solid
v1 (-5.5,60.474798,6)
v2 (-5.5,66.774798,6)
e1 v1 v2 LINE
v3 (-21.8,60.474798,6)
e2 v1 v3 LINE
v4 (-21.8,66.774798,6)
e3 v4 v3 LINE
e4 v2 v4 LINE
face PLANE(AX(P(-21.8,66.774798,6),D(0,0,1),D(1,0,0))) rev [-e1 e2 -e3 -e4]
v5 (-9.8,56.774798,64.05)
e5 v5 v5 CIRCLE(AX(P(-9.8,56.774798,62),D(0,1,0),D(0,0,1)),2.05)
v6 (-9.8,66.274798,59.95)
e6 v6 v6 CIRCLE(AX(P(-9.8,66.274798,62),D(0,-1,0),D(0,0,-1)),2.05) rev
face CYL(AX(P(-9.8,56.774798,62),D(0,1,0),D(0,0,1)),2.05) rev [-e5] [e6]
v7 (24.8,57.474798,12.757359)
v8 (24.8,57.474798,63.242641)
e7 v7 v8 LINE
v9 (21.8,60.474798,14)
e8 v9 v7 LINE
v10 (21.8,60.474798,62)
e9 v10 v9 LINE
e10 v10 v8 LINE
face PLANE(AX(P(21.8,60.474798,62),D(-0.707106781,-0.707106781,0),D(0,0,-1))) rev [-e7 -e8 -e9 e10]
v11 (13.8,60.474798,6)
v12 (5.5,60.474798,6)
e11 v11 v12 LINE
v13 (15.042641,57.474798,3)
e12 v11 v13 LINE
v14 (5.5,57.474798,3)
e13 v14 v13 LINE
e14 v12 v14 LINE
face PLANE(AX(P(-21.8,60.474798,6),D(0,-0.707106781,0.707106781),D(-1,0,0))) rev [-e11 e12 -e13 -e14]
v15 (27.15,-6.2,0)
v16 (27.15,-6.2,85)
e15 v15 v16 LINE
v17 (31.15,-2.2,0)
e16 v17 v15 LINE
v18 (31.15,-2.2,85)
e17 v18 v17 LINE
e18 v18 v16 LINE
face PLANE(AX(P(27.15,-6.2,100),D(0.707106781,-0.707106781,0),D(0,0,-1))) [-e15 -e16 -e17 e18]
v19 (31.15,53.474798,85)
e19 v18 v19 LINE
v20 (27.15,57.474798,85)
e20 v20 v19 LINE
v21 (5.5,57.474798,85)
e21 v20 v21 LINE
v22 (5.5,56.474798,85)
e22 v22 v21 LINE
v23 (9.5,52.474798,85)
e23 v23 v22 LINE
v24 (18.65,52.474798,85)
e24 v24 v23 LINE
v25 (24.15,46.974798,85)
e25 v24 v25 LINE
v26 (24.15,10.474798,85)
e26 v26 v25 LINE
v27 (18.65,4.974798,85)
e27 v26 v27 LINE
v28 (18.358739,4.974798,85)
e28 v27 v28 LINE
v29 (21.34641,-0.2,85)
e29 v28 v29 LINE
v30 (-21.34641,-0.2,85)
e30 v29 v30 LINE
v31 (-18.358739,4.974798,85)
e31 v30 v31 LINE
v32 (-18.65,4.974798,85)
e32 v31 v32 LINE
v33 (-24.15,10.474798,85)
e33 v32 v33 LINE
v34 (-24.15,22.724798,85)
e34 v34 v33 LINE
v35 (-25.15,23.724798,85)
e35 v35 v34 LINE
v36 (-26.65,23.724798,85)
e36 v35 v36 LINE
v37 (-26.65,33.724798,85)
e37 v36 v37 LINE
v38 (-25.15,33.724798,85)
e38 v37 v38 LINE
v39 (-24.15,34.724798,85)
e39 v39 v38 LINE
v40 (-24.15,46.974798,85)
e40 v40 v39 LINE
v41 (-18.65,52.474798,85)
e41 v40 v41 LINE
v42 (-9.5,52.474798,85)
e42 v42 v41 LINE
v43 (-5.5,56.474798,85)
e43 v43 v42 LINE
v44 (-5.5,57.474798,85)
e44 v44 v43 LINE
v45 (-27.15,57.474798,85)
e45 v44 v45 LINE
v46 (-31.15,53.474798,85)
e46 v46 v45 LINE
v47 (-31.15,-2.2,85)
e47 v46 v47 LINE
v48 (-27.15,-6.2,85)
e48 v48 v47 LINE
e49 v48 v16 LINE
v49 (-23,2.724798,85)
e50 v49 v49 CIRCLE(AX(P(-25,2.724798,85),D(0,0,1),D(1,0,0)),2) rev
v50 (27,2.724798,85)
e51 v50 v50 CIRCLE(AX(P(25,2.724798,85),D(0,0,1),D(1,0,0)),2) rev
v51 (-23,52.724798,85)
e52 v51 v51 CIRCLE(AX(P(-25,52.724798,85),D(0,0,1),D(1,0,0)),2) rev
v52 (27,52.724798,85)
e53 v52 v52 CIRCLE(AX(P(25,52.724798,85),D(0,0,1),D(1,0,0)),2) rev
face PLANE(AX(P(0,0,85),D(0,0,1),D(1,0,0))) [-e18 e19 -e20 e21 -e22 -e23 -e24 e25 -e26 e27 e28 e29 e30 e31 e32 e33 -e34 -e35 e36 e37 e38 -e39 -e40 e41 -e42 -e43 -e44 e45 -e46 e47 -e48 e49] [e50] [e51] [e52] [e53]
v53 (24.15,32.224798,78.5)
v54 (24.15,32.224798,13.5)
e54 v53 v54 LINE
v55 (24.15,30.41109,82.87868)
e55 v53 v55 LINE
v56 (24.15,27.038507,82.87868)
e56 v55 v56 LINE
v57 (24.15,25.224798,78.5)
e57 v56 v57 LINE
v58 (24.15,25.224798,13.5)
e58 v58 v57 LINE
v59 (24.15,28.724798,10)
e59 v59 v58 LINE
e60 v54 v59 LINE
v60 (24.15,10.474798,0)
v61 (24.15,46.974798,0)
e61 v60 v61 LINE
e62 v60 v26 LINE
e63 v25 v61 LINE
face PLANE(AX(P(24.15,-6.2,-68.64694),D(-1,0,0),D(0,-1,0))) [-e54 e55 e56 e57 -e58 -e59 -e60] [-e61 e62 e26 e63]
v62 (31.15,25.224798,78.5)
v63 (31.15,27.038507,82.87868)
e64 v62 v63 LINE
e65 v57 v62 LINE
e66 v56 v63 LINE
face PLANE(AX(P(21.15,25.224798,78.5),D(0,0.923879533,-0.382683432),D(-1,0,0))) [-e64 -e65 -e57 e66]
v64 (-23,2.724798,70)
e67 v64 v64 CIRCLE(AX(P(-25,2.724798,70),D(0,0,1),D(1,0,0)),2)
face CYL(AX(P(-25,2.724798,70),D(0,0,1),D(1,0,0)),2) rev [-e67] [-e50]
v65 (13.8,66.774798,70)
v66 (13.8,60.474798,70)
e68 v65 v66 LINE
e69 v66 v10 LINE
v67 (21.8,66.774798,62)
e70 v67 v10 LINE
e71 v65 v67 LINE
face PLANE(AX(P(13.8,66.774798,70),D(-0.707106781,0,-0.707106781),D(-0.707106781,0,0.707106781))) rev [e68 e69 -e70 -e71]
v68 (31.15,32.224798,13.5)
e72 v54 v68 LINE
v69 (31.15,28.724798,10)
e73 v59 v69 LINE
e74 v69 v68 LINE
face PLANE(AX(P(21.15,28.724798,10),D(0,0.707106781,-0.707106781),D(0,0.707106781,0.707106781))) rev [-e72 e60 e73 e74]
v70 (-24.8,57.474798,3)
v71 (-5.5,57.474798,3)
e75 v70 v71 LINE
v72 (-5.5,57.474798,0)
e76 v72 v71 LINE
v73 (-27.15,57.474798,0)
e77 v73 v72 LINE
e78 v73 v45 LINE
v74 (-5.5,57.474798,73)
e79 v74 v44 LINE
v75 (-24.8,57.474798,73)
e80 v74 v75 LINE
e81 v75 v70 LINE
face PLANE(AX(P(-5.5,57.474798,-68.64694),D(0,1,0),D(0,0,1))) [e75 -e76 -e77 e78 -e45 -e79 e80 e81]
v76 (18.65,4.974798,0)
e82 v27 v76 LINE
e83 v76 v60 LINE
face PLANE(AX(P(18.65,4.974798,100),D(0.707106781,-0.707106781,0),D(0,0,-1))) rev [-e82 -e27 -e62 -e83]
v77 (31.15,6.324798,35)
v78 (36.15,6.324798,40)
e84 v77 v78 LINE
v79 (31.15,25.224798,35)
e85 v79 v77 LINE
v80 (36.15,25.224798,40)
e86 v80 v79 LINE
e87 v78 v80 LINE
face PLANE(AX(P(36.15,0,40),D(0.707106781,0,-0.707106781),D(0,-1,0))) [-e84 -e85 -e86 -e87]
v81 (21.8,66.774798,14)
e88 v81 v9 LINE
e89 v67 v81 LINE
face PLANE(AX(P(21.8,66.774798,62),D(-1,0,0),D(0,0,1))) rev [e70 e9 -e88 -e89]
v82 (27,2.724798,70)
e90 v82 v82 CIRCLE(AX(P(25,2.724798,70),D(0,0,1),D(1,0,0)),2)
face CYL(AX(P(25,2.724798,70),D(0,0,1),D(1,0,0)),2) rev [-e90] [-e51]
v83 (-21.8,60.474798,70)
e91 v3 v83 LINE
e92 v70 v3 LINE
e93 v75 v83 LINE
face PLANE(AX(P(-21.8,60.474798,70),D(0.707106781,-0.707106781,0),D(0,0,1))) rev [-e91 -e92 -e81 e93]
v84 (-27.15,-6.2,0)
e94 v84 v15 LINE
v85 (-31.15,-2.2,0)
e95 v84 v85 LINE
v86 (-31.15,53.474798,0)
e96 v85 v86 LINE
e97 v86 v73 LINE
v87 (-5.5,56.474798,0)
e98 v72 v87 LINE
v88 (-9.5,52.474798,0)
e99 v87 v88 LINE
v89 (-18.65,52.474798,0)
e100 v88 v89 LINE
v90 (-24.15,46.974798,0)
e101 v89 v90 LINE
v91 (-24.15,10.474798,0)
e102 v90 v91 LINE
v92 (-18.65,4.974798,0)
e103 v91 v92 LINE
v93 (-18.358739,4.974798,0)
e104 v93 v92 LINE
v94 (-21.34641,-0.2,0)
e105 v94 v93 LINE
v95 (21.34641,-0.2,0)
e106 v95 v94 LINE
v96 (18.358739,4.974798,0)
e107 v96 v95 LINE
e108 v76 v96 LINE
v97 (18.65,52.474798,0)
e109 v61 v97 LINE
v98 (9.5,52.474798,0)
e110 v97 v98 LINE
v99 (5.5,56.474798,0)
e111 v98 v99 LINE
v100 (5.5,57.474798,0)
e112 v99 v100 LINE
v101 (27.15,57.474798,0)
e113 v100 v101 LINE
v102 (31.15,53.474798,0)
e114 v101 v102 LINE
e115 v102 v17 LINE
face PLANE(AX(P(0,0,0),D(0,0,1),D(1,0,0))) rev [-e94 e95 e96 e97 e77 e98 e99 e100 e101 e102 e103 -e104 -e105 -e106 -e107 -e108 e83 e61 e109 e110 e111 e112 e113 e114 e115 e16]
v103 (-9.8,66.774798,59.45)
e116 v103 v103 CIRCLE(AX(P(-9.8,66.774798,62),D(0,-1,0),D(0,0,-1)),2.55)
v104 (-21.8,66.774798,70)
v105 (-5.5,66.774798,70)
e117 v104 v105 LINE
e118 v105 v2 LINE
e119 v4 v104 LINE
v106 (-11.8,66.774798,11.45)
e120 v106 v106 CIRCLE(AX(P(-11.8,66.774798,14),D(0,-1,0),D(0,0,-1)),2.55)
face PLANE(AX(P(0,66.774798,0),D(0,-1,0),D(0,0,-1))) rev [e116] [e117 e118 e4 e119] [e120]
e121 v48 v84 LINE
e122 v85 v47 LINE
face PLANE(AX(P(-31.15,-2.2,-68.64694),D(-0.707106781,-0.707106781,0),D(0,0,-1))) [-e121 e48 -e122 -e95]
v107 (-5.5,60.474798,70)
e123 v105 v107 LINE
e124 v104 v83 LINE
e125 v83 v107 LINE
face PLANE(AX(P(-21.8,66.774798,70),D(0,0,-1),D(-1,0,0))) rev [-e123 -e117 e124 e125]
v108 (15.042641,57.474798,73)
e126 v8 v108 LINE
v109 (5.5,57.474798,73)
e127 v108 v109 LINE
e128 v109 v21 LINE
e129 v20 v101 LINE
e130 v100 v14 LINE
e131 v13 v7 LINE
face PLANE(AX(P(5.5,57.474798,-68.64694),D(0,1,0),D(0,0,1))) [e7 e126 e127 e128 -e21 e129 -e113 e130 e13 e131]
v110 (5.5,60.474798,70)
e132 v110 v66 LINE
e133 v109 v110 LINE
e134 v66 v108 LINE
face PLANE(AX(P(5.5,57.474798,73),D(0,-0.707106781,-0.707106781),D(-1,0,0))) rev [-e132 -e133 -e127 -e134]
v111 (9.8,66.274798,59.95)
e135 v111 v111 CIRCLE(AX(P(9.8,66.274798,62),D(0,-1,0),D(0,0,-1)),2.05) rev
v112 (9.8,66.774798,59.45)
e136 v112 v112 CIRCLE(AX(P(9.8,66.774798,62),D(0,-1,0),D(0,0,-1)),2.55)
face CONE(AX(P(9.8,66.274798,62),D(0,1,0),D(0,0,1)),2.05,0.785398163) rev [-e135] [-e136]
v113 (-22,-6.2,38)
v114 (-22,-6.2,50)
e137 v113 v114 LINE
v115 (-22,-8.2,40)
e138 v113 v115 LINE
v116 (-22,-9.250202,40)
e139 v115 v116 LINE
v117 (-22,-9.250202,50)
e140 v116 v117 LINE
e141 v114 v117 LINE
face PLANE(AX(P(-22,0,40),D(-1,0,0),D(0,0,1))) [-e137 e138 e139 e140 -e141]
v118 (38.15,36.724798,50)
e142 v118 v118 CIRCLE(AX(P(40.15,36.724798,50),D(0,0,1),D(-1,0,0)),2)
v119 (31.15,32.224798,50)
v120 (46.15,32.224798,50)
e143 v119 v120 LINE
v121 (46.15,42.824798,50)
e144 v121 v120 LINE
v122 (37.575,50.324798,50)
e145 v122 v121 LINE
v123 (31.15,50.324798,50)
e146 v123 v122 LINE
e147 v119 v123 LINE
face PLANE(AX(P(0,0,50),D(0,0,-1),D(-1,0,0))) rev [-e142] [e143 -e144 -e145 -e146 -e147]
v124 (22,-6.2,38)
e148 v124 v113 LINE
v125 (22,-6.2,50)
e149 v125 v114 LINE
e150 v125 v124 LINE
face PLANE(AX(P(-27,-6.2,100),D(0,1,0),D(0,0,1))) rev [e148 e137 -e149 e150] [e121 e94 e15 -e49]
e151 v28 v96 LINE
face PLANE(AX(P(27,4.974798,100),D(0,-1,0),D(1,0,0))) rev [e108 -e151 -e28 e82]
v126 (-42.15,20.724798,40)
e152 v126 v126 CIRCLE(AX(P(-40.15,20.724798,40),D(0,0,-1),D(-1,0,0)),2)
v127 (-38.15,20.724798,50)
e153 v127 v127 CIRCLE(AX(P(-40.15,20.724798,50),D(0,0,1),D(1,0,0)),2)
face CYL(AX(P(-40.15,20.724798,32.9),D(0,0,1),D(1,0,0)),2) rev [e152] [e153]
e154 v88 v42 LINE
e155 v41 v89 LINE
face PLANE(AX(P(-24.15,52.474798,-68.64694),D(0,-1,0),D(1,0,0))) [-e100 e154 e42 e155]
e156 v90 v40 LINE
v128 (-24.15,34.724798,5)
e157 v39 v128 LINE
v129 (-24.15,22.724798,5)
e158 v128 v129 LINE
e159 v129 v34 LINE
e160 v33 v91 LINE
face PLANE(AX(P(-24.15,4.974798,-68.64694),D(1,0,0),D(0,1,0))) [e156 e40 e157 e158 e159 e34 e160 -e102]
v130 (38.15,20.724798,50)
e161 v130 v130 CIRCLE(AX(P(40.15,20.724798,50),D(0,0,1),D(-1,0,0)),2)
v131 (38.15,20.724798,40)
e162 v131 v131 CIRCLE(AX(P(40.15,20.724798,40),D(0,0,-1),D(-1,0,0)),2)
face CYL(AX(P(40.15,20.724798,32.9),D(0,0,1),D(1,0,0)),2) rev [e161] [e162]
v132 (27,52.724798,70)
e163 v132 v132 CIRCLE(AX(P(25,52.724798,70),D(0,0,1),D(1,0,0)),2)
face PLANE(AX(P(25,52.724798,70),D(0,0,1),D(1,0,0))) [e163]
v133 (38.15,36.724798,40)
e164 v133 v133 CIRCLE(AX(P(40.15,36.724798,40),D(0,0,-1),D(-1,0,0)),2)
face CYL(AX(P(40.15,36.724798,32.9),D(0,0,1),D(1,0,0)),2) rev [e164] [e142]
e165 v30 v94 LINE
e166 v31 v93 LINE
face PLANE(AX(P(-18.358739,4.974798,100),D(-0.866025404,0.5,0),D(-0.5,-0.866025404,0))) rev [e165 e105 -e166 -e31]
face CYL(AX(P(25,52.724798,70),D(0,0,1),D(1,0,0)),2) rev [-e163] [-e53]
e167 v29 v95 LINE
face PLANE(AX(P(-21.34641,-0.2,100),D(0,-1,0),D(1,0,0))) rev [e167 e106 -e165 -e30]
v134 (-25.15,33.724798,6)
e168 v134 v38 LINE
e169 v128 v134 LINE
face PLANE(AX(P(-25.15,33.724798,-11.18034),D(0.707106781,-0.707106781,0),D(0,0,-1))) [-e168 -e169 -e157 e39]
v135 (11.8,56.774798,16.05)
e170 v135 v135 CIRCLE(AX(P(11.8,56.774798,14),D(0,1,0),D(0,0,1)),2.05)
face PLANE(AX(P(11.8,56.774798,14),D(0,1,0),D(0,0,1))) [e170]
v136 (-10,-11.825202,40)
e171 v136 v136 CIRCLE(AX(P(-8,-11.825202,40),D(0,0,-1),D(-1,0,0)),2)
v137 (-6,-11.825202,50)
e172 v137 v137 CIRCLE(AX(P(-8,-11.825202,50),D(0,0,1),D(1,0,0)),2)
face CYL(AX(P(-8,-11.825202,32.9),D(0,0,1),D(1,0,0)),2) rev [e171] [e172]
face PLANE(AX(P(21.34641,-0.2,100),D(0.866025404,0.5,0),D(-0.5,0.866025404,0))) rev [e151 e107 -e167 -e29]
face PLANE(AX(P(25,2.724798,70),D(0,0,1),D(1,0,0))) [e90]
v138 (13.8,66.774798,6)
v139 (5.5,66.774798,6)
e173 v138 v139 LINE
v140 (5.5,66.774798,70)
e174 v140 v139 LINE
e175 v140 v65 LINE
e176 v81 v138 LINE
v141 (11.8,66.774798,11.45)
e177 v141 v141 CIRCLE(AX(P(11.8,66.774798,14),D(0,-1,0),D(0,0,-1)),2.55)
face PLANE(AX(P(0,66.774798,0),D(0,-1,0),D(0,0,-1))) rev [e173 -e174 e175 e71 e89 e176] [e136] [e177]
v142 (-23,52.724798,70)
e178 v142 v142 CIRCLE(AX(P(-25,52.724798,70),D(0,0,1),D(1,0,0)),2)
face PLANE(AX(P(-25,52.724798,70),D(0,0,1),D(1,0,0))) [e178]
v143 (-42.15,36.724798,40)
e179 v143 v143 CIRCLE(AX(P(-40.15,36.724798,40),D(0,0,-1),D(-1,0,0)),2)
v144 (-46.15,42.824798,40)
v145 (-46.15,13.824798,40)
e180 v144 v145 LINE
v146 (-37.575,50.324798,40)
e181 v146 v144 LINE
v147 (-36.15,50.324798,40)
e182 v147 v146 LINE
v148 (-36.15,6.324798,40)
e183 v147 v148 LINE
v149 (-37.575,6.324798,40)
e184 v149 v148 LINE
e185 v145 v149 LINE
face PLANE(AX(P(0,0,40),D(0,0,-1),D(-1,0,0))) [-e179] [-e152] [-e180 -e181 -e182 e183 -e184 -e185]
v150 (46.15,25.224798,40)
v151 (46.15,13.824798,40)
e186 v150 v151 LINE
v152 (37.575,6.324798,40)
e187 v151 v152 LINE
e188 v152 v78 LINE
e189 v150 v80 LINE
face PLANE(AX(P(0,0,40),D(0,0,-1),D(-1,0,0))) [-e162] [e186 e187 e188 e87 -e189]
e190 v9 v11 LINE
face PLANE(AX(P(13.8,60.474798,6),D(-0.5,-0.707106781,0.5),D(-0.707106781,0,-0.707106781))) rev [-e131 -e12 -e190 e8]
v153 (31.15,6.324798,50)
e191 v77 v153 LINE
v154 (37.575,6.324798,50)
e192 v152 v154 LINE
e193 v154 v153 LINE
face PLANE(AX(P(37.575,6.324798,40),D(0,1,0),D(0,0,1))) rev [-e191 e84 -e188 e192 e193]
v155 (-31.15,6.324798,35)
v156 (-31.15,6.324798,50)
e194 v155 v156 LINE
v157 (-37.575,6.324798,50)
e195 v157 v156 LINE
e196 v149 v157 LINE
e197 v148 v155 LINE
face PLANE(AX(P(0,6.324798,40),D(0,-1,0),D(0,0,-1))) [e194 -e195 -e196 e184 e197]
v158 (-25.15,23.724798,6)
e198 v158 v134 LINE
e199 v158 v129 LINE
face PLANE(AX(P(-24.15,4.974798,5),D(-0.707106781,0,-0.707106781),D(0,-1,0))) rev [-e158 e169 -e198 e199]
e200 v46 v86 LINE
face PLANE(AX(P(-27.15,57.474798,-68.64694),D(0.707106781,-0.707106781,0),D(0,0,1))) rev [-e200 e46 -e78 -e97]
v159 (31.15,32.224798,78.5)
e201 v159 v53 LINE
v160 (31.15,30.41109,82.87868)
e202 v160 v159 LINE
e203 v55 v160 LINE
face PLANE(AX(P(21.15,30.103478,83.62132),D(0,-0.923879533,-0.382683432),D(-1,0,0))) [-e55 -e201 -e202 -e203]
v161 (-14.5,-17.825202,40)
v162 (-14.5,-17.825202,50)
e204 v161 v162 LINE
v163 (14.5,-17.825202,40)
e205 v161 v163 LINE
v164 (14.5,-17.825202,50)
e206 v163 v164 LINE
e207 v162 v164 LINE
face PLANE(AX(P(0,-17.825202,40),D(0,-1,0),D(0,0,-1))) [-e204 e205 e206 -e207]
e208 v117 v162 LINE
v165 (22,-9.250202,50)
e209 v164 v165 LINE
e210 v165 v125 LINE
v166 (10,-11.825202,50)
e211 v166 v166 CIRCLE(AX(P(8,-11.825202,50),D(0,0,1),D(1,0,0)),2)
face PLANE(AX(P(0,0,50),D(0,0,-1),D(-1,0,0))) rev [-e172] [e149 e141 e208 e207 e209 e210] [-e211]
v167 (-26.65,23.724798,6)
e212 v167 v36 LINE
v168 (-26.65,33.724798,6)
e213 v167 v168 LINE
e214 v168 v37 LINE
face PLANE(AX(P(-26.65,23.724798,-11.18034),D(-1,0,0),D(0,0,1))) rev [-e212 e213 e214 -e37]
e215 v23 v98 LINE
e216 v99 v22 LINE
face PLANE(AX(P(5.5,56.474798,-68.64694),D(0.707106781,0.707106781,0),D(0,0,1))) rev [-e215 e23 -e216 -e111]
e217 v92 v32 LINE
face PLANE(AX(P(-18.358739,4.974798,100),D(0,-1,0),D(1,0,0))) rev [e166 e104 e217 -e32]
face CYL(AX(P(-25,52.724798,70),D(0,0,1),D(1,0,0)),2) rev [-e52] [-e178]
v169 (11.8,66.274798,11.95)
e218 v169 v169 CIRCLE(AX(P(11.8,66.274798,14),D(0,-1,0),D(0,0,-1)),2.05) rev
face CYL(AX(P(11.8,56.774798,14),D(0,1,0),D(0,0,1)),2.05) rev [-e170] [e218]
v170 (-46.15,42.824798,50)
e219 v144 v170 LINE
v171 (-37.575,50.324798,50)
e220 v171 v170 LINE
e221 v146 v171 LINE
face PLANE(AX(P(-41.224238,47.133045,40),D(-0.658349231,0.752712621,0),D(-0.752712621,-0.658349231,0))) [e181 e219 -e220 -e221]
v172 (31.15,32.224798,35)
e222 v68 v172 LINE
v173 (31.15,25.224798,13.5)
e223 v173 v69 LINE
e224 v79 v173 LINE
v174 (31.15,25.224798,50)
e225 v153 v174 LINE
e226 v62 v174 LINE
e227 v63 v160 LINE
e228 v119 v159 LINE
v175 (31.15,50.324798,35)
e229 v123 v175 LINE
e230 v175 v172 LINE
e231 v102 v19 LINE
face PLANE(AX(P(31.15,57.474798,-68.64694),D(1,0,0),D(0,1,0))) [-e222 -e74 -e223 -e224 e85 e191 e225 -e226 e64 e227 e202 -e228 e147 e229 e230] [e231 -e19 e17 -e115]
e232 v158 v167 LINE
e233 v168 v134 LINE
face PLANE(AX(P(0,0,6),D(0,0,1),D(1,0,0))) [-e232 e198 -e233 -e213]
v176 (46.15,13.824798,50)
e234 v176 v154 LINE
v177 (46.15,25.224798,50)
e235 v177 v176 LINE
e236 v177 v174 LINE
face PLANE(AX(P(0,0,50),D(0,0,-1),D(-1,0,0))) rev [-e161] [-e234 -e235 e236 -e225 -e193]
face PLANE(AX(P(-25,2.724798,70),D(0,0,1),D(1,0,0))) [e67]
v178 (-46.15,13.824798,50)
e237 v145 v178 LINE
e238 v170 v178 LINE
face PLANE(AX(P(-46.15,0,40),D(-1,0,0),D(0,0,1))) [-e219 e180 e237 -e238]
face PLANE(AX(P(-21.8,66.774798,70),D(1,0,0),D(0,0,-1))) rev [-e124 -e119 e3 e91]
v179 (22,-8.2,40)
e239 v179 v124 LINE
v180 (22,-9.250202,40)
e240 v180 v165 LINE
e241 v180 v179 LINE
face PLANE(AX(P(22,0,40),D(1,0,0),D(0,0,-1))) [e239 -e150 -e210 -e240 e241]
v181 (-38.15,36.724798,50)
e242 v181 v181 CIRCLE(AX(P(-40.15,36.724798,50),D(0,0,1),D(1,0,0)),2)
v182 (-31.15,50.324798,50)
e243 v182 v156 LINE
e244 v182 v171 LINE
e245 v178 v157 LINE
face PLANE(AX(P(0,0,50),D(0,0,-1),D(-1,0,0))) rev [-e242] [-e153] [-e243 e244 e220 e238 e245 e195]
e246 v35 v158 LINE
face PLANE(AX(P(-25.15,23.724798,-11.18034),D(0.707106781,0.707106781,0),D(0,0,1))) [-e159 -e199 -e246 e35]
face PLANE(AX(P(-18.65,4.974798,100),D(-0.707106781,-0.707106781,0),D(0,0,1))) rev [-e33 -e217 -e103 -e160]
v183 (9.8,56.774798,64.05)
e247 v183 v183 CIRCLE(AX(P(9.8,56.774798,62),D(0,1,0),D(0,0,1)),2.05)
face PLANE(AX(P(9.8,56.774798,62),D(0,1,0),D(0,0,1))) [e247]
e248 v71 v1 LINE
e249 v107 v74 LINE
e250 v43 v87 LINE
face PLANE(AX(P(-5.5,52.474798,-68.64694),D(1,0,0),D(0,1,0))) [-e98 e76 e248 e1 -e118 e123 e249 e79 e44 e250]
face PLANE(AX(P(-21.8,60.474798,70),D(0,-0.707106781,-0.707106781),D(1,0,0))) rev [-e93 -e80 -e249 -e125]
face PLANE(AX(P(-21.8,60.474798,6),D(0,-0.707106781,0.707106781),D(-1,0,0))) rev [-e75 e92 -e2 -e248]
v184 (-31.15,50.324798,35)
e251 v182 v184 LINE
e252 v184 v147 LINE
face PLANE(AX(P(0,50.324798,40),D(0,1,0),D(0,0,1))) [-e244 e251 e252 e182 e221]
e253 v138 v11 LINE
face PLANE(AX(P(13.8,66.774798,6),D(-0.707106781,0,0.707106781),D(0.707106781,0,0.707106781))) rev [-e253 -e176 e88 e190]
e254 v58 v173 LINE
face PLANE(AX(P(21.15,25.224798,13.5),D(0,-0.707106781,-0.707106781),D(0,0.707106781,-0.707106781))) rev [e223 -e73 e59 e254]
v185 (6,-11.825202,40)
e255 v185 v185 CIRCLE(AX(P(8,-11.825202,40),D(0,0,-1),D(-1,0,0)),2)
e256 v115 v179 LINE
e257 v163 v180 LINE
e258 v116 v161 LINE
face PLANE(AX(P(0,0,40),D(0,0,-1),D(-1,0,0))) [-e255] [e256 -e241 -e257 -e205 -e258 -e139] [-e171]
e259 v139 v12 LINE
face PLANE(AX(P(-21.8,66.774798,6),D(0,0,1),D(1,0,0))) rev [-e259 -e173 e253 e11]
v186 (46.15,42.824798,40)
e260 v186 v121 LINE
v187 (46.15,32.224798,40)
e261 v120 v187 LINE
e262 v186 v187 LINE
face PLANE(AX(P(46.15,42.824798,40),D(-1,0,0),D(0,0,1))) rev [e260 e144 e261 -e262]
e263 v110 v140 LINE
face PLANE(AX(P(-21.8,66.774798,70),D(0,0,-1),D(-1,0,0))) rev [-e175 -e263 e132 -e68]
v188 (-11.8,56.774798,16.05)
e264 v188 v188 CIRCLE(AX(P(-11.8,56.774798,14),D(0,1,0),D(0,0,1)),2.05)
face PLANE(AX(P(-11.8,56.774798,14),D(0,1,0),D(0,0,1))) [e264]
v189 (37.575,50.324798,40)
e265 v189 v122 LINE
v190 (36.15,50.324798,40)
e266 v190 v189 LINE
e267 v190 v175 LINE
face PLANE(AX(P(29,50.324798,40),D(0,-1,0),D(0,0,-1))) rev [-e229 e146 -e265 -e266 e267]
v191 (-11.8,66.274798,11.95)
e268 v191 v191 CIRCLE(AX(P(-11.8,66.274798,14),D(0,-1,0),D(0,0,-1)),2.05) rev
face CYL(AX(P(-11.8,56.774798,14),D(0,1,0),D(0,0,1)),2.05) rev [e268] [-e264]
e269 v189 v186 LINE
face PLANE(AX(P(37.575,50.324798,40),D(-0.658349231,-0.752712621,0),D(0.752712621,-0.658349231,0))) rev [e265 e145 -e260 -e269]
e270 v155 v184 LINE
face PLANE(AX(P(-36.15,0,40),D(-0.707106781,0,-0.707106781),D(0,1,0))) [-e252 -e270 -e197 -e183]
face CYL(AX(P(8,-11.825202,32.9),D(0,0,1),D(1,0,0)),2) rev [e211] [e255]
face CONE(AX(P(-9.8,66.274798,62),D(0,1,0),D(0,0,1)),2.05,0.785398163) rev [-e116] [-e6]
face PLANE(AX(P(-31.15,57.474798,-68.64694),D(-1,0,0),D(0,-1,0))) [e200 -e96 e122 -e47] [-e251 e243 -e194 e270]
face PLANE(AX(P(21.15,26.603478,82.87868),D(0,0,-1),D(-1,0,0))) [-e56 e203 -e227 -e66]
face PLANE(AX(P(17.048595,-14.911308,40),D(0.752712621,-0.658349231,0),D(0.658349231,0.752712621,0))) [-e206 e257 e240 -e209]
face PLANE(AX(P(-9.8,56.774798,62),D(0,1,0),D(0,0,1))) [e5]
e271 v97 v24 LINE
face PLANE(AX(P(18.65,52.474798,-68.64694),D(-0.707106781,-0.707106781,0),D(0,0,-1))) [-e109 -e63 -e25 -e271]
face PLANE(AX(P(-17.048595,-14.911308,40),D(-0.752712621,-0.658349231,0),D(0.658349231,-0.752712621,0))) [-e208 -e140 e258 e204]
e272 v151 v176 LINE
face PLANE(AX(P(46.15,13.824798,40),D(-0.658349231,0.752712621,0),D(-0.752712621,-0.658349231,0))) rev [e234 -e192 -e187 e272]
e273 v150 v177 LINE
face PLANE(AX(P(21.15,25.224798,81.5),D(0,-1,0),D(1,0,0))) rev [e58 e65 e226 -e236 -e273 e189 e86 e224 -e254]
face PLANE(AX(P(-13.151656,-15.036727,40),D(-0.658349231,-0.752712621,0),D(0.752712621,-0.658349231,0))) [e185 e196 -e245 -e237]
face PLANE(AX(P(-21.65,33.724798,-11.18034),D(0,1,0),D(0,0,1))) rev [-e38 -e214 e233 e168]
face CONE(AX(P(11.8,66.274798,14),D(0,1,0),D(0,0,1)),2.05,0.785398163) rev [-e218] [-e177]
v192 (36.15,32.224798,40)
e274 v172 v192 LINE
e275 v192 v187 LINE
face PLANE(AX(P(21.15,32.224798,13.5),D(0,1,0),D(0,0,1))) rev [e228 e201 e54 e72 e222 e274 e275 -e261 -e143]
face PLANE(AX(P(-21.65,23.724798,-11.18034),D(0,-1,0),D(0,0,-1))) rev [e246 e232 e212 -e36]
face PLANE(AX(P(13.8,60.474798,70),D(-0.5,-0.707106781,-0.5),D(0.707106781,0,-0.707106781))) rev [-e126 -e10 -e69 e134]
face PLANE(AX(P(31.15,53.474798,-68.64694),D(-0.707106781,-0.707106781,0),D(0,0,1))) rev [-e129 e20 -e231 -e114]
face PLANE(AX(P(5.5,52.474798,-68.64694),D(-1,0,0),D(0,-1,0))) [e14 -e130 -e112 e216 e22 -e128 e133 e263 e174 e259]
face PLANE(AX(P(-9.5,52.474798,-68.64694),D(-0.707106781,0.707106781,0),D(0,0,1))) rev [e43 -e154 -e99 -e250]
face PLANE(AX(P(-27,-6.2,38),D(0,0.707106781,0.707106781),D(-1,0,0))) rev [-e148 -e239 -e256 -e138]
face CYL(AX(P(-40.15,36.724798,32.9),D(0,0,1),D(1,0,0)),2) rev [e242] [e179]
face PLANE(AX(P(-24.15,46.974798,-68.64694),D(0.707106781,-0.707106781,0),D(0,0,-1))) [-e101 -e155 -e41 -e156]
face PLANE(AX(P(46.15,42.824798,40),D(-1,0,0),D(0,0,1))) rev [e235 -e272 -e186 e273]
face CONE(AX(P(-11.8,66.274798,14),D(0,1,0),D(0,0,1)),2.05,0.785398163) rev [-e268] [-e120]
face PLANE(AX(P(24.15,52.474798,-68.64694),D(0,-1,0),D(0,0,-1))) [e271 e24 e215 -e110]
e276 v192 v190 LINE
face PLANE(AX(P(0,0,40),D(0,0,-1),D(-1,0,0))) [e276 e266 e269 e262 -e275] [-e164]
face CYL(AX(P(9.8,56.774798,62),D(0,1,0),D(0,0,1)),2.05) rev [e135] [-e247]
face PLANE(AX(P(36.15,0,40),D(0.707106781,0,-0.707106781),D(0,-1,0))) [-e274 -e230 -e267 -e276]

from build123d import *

# Parameters (mm, degrees)
BOSS_EXTRUDE1_DEPTH     = 100
BOSS_EXTRUDE2_DEPTH     = 100
CUT_EXTRUDE1_DEPTH      = 10
CHAMFER1_SIZE           = 5.5
CHAMFER2_SIZE           = 4
SKETCH8_R               = 2
BOSS_EXTRUDE3_DEPTH     = 9.3
CUT_EXTRUDE3_DEPTH      = 125.214315536
CUT_EXTRUDE3_DEPTH_BACK = 10
SKETCH9_W               = 11
SKETCH9_H               = 9.3
CHAMFER3_SIZE           = 4
CHAMFER4_SIZE           = 3
CHAMFER5_SIZE           = 3
SKETCH10_W              = 5
SKETCH10_H              = 10
CUT_EXTRUDE4_DEPTH      = 94
CHAMFER7_SIZE           = 1
CHAMFER8_SIZE           = 1
SKETCH11_R              = 2.05
CUT_EXTRUDE5_DEPTH      = 10
CHAMFER9_SIZE           = 0.5
SKETCH12_R              = 2
CUT_EXTRUDE6_DEPTH      = 30
BOSS_EXTRUDE6_START     = -2
BOSS_EXTRUDE6_DEPTH     = 10
SKETCH17_R              = 2
CUT_EXTRUDE7_DEPTH      = 17.1
SKETCH19_W              = 50
SKETCH19_H              = 7
CUT_EXTRUDE13_DEPTH     = 17.1
SKETCH20_W              = 62.3
SKETCH20_H              = 63.674798271
CUT_EXTRUDE14_DEPTH     = 15
CHAMFER10_SIZE          = 5
CHAMFER11_SIZE          = 2


with BuildPart() as part:
    # Sketch4 → Boss-Extrude1 (new body)
    with BuildSketch(Plane.XY):
        Polygon((-18.358738987, 4.974798271), (-27, 4.974798271), (-27, -6.2), (27, -6.2), (27, 4.974798271), (18.358738987, 4.974798271), (21.346410162, -0.2), (-21.346410162, -0.2), align=None)
    extrude(amount=BOSS_EXTRUDE1_DEPTH)

    # Sketch6 → Boss-Extrude2 (add)
    with BuildSketch(Plane.XY.offset(100)):
        Polygon((-24.15, 4.974798271), (-24.15, 52.474798271), (-5.5, 52.474798271), (-5.5, 57.474798271), (-31.15, 57.474798271), (-31.15, -6.2), (-24.15, -6.2), align=None)
        Polygon((24.15, -6.2), (24.15, 52.474798271), (5.5, 52.474798271), (5.5, 57.474798271), (31.15, 57.474798271), (31.15, -6.2), align=None)
    extrude(amount=-BOSS_EXTRUDE2_DEPTH)

    # Sketch7 → Cut-Extrude1 (cut)
    with BuildSketch(Plane(origin=(31.15, 0, 0), x_dir=(0, 0, -1), z_dir=(1, 0, 0))):
        Polygon((-85, 28.724798271), (-81.5, 25.224798271), (-13.5, 25.224798271), (-10, 28.724798271), (-13.5, 32.224798271), (-81.5, 32.224798271), align=None)
    extrude(amount=-CUT_EXTRUDE1_DEPTH, mode=Mode.SUBTRACT)

    # Chamfer1
    chamfer1_edges = [part.edges().sort_by_distance(p)[0] for p in [
        (-24.15, 52.474798271, 50),
        (-24.15, 4.974798271, 50),
        (24.15, 4.974798271, 50),
        (24.15, 52.474798271, 50),
    ]]
    chamfer(chamfer1_edges, length=CHAMFER1_SIZE)

    # Chamfer2
    chamfer2_edges = [part.edges().sort_by_distance(p)[0] for p in [
        (-5.5, 52.474798271, 50),
        (5.5, 52.474798271, 50),
    ]]
    chamfer(chamfer2_edges, length=CHAMFER2_SIZE)

    # Sketch8 → Boss-Extrude3 (add)
    with BuildSketch(Plane(origin=(0, 57.474798271, 0), x_dir=(1, 0, 0), z_dir=(0, 1, 0))):
        Polygon((-21.8, -70), (13.8, -70), (21.8, -62), (21.8, -14), (13.8, -6), (-21.8, -6), align=None)
        with Locations(Location((9.8, -62, 0), (0, 0, 270))):
            Circle(SKETCH8_R, mode=Mode.SUBTRACT)
        with Locations(Location((11.8, -14, 0), (0, 0, 270))):
            Circle(SKETCH8_R, mode=Mode.SUBTRACT)
        with Locations(Location((-11.8, -14, 0), (0, 0, 270))):
            Circle(SKETCH8_R, mode=Mode.SUBTRACT)
        with Locations(Location((-9.8, -62, 0), (0, 0, 270))):
            Circle(SKETCH8_R, mode=Mode.SUBTRACT)
    extrude(amount=BOSS_EXTRUDE3_DEPTH)

    # Sketch9 → Cut-Extrude3 (cut, two sides: drawn at the far end of the back side and taken through both)
    with BuildSketch(Plane.XY.offset(-CUT_EXTRUDE3_DEPTH_BACK)):
        with Locations((0, 62.124798271)):
            Rectangle(SKETCH9_W, SKETCH9_H)
    extrude(amount=CUT_EXTRUDE3_DEPTH + CUT_EXTRUDE3_DEPTH_BACK, mode=Mode.SUBTRACT)

    # Chamfer3
    chamfer3_edges = [part.edges().sort_by_distance(p)[0] for p in [
        (-31.15, -6.2, 50),
        (-31.15, 57.474798271, 50),
        (31.15, -6.2, 50),
        (31.15, 57.474798271, 50),
    ]]
    chamfer(chamfer3_edges, length=CHAMFER3_SIZE)

    # Chamfer4
    chamfer4_edges = [part.edges().sort_by_distance(p)[0] for p in [
        (9.65, 57.474798271, 70),
        (-21.8, 57.474798271, 38),
        (-13.65, 57.474798271, 70),
        (17.8, 57.474798271, 66),
        (21.8, 57.474798271, 38),
        (17.8, 57.474798271, 10),
        (9.65, 57.474798271, 6),
        (-13.65, 57.474798271, 6),
    ]]
    chamfer(chamfer4_edges, length=CHAMFER4_SIZE)

    # Chamfer5
    # the kernel refuses this chamfer: 3 mm, written as the material it adds along each edge
    with BuildSketch(Plane(origin=(31.15, 25.224798271, 81.5), x_dir=(0, -0.014760203742521738, -0.9998910622590239), z_dir=(-1, 0, 0)), Plane(origin=(31.15, 32.224798271, 81.5), x_dir=(0, -0.6965927104131427, 0.7174667907292097), z_dir=(-1, 0, 0))) as chamfer5_piece_1:
        Polygon((CHAMFER5_SIZE * 0.999891062259, -CHAMFER5_SIZE * 0.0147602037425), (-CHAMFER5_SIZE * 0.717466790729, -CHAMFER5_SIZE * 0.696592710413), (0, 0), align=None)
    extrude(amount=7)
    with BuildSketch(Plane(origin=(31.15, 28.724798271, 85), x_dir=(0, 0.7262819568766863, -0.687396915264661), z_dir=(-1, 0, 0))) as chamfer5_piece_2:
        Polygon((CHAMFER5_SIZE * 0.999621916911, CHAMFER5_SIZE * 0.0274958766106), (-CHAMFER5_SIZE * 0.0274958766106, CHAMFER5_SIZE * 0.999621916911), (0, 0), align=None)
    extrude(amount=7)

    # Sketch10 → Cut-Extrude4 (cut)
    with BuildSketch(Plane.XY.offset(100)):
        with Locations((-24.15, 28.724798271)):
            Rectangle(SKETCH10_W, SKETCH10_H)
    extrude(amount=-CUT_EXTRUDE4_DEPTH, mode=Mode.SUBTRACT)

    # Chamfer7
    chamfer7_edges = [part.edges().sort_by_distance(p)[0] for p in [
        (-24.15, 28.724798271, 6),
    ]]
    chamfer(chamfer7_edges, length=CHAMFER7_SIZE)

    # Chamfer8
    chamfer8_edges = [part.edges().sort_by_distance(p)[0] for p in [
        (-24.15, 23.724798271, 52.5),
        (-24.15, 33.724798271, 52.5),
    ]]
    chamfer(chamfer8_edges, length=CHAMFER8_SIZE)

    # Sketch11 → Cut-Extrude5 (cut)
    with BuildSketch(Plane(origin=(0, 66.774798271, 0), x_dir=(1, 0, 0), z_dir=(0, 1, 0))):
        with Locations(Location((-11.8, -14, 0), (0, 0, 270))):
            Circle(SKETCH11_R)
        with Locations(Location((11.8, -14, 0), (0, 0, 270))):
            Circle(SKETCH11_R)
        with Locations(Location((-9.8, -62, 0), (0, 0, 270))):
            Circle(SKETCH11_R)
        with Locations(Location((9.8, -62, 0), (0, 0, 270))):
            Circle(SKETCH11_R)
    extrude(amount=-CUT_EXTRUDE5_DEPTH, mode=Mode.SUBTRACT)

    # Chamfer9
    chamfer9_edges = [part.edges().sort_by_distance(p)[0] for p in [
        (11.8, 66.774798271, 11.95),
        (-9.8, 66.774798271, 59.95),
        (9.8, 66.774798271, 59.95),
        (-11.8, 66.774798271, 11.95),
    ]]
    chamfer(chamfer9_edges, length=CHAMFER9_SIZE)

    # Sketch12 → Cut-Extrude6 (cut)
    with BuildSketch(Plane.XY.offset(100)):
        with Locations((-25, 52.724798271)):
            Circle(SKETCH12_R)
        with Locations((25, 52.724798271)):
            Circle(SKETCH12_R)
        with Locations((-25, 2.724798271)):
            Circle(SKETCH12_R)
        with Locations((25, 2.724798271)):
            Circle(SKETCH12_R)
    extrude(amount=-CUT_EXTRUDE6_DEPTH, mode=Mode.SUBTRACT)

    # Sketch16 → Boss-Extrude6 (add)
    with BuildSketch(Plane(origin=(0, 0, 48), x_dir=(-1, 0, 0), z_dir=(0, 0, -1)).offset(BOSS_EXTRUDE6_START)):
        Polygon((-22, -0.675201729), (22, -0.675201729), (22, -9.250201729), (14.5, -17.825201729), (-14.5, -17.825201729), (-22, -9.250201729), align=None)
        Polygon((-29, 50.324798271), (-37.575, 50.324798271), (-46.15, 42.824798271), (-46.15, 13.824798271), (-37.575, 6.324798271), (-29, 6.324798271), align=None)
        Polygon((37.575, 6.324798271), (29, 6.324798271), (29, 50.324798271), (37.575, 50.324798271), (46.15, 42.824798271), (46.15, 13.824798271), align=None)
    extrude(amount=BOSS_EXTRUDE6_DEPTH)

    # Sketch17 → Cut-Extrude7 (cut)
    with BuildSketch(Plane.XY.offset(50)):
        with Locations((-40.15, 36.724798271)):
            Circle(SKETCH17_R)
        with Locations((-40.15, 20.724798271)):
            Circle(SKETCH17_R)
        with Locations(Location((40.15, 20.724798271, 0), (0, 0, 180))):
            Circle(SKETCH17_R)
        with Locations(Location((40.15, 36.724798271, 0), (0, 0, 180))):
            Circle(SKETCH17_R)
        with Locations((-8, -11.825201729)):
            Circle(SKETCH17_R)
        with Locations((8, -11.825201729)):
            Circle(SKETCH17_R)
    extrude(amount=-CUT_EXTRUDE7_DEPTH, mode=Mode.SUBTRACT)

    # Sketch19 → Cut-Extrude13 (cut)
    with BuildSketch(Plane(origin=(0, 0, 40), x_dir=(-1, 0, 0), z_dir=(0, 0, -1))):
        with Locations((-49.15, 28.724798271)):
            Rectangle(SKETCH19_W, SKETCH19_H)
    extrude(amount=-CUT_EXTRUDE13_DEPTH, mode=Mode.SUBTRACT)

    # Sketch20 → Cut-Extrude14 (cut)
    with BuildSketch(Plane.XY.offset(100)):
        with Locations((0, 25.637399136)):
            Rectangle(SKETCH20_W, SKETCH20_H)
    extrude(amount=-CUT_EXTRUDE14_DEPTH, mode=Mode.SUBTRACT)

    # Chamfer10
    chamfer10_edges = [part.edges().sort_by_distance(p)[0] for p in [
        (-31.15, 28.324798271, 40),
        (31.15, 41.274798271, 40),
        (31.15, 15.774798271, 40),
    ]]
    chamfer(chamfer10_edges, length=CHAMFER10_SIZE)

    # Chamfer11
    chamfer11_edges = [part.edges().sort_by_distance(p)[0] for p in [
        (0, -6.2, 40),
    ]]
    chamfer(chamfer11_edges, length=CHAMFER11_SIZE)


solid = part.part
